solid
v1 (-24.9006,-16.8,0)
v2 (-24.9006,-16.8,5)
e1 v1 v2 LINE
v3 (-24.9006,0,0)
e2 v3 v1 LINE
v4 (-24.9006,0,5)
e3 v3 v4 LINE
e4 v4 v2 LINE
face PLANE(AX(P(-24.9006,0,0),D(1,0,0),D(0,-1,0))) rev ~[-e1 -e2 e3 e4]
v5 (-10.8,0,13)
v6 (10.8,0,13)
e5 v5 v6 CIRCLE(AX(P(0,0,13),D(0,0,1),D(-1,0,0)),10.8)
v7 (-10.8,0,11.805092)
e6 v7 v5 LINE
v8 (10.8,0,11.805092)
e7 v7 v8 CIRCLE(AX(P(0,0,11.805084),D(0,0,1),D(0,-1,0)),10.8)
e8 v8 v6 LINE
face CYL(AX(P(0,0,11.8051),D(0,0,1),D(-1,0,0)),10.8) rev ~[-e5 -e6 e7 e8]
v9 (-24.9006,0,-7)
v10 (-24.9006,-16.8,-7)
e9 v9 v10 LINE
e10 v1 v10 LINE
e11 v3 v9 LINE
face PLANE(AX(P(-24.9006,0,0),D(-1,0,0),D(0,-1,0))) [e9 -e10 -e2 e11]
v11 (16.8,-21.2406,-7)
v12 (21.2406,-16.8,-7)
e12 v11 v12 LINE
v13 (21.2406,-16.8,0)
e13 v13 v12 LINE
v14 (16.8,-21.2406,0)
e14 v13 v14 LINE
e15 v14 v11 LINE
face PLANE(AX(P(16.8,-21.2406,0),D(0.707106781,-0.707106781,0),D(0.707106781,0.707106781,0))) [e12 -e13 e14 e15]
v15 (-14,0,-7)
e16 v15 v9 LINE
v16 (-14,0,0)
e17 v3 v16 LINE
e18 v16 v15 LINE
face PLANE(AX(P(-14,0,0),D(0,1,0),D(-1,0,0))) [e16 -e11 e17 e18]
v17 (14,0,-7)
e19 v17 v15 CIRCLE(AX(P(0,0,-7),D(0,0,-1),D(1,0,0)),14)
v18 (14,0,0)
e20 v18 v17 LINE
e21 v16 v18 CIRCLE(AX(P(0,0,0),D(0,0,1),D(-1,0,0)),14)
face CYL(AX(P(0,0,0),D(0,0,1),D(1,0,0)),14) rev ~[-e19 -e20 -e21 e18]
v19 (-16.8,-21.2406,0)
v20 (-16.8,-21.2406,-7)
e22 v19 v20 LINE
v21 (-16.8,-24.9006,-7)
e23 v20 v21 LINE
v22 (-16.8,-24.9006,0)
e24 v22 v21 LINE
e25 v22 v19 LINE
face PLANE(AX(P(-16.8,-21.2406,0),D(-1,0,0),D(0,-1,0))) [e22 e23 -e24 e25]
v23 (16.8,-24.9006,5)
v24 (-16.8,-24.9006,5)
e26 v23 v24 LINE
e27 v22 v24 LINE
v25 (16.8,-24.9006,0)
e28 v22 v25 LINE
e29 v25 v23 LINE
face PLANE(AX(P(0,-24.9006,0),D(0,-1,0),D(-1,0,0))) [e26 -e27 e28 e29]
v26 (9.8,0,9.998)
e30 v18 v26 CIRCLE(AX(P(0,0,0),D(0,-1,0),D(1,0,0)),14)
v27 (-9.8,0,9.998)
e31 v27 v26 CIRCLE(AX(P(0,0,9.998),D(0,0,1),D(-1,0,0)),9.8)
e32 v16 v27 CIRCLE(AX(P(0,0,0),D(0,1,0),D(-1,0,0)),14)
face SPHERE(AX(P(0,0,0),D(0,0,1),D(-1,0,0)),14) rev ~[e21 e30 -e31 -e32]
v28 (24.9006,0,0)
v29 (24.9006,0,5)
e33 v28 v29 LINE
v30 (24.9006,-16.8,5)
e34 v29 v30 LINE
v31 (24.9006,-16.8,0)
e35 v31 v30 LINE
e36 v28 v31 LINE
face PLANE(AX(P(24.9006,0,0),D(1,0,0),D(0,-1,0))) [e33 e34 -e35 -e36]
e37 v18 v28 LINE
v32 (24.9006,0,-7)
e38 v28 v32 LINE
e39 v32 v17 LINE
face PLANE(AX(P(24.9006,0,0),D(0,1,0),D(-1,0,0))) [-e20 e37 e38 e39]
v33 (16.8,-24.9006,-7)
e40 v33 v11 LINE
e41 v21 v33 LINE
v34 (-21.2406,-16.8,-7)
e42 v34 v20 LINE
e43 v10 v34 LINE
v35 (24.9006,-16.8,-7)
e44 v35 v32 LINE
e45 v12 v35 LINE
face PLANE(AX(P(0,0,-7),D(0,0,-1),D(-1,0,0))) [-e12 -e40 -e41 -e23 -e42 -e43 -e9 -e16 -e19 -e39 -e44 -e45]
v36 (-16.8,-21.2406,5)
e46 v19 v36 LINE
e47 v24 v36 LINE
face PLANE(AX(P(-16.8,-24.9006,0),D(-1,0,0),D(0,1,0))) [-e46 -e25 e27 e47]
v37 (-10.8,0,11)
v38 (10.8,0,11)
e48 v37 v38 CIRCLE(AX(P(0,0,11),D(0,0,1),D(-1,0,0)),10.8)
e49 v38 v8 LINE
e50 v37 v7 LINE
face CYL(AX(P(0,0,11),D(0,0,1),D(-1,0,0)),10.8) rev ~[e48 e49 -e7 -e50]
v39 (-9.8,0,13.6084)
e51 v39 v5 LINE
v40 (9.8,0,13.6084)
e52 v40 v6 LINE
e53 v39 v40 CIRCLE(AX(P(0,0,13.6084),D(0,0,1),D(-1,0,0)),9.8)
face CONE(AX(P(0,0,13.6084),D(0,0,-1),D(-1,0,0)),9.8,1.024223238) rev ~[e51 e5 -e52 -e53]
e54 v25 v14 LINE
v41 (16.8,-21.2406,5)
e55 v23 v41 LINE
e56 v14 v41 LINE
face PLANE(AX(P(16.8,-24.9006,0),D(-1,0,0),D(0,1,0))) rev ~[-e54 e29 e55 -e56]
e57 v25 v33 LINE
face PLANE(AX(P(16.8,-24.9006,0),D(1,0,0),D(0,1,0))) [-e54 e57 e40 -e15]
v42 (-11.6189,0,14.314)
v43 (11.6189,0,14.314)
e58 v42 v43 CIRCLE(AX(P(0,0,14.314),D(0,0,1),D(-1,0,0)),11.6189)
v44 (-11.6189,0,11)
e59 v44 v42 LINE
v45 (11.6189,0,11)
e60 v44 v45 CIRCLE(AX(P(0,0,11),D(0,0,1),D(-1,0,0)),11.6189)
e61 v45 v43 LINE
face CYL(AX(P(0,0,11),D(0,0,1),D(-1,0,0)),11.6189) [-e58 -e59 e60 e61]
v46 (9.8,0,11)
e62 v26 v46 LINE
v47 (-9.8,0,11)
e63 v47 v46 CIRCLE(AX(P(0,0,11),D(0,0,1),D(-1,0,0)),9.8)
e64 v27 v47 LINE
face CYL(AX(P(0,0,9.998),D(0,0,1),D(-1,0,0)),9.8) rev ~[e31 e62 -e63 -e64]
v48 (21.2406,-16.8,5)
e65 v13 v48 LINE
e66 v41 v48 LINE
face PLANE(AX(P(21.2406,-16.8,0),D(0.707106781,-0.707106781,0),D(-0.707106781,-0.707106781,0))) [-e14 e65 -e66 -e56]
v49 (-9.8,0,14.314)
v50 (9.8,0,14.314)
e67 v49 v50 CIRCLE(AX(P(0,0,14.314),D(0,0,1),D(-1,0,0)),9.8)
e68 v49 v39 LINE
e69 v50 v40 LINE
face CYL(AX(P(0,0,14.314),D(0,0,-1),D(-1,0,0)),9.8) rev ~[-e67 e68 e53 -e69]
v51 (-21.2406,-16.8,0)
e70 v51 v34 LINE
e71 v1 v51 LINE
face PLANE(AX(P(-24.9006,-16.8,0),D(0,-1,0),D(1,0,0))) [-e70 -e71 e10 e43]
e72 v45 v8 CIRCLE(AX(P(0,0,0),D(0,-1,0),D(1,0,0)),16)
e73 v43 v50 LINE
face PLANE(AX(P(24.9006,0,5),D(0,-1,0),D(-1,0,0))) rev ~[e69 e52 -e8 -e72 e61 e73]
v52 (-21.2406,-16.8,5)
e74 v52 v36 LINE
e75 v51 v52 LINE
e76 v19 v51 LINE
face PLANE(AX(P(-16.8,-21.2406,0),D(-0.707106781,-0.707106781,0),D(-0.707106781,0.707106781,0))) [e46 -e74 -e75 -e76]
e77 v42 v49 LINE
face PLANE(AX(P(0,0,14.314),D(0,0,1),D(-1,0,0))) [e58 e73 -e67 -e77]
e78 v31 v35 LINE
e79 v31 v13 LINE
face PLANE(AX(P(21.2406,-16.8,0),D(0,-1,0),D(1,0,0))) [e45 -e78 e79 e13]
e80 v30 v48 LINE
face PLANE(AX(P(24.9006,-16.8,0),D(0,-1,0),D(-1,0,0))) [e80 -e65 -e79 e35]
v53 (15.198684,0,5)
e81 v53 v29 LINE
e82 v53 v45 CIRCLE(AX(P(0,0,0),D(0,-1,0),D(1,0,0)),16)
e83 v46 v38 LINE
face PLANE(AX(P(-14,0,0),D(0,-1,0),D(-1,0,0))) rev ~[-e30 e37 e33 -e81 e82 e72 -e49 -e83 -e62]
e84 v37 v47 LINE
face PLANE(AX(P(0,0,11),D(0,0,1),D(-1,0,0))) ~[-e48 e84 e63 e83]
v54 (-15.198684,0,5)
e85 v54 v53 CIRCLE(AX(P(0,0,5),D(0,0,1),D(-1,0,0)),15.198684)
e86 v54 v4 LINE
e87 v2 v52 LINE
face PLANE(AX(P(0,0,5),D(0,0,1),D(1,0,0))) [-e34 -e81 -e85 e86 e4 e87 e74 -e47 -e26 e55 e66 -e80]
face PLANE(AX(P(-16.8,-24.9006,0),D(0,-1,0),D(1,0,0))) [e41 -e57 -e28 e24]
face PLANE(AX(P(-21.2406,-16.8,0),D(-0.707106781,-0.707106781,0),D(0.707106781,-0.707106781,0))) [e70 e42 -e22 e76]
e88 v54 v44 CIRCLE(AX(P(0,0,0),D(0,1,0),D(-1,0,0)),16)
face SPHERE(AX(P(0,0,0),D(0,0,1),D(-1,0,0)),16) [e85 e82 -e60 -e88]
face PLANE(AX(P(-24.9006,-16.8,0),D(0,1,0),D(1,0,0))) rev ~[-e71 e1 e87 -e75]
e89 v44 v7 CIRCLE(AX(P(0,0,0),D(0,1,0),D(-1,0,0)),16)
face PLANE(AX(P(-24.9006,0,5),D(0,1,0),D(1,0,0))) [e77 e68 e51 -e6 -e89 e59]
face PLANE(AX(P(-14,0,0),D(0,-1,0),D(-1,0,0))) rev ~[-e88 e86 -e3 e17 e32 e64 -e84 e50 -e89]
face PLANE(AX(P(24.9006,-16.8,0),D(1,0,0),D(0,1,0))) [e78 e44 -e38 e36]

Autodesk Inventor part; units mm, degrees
ref_plane "YZ Plane" through (0, 0, 0) normal (1, 0, 0) x (0, 1, 0)
ref_plane "XZ Plane" through (0, 0, 0) normal (0, 1, 0) x (-1, 0, 0)
sketch "Sketch1" plane through (0, 0, 0) normal (0, 0, 1) x (1, 0, 0)
  line L0 (-36.8533, 0) -> (46.8153, 0) construction
  line L1 (0, -29.8808) -> (0, 4.9801) construction
  line L2 (0, 0) -> (24.6516, -24.6516) construction
  line L3 (0, 0) -> (34.8626, 0) construction
  line L4 (0, -24.9006) -> (16.8, -24.9006)
  line L5 (16.8, -24.9006) -> (16.8, -21.2406)
  line L6 (16.8, -21.2406) -> (19.0203, -19.0203)
  line L7 (24.9006, 0) -> (24.9006, -16.8)
  line L8 (24.9006, -16.8) -> (21.2406, -16.8)
  line L9 (21.2406, -16.8) -> (19.0203, -19.0203)
  line L10 (0, 0) -> (-24.6516, -24.6516) construction
  line L11 (0, -24.9006) -> (-16.8, -24.9006)
  line L12 (-16.8, -24.9006) -> (-16.8, -21.2406)
  line L13 (-16.8, -21.2406) -> (-19.0203, -19.0203)
  line L14 (-24.9006, 0) -> (-24.9006, -16.8)
  line L15 (-24.9006, -16.8) -> (-21.2406, -16.8)
  line L16 (-21.2406, -16.8) -> (-19.0203, -19.0203)
  arc A0 (-14, 0) -> (14, 0) centre (0, 0) ccw
  line L17 (0, 0) -> (14, 0) construction
  line L18 (0, 0) -> (-14, 0) construction
  line L19 (-14, 0) -> (-24.9006, 0)
  line L20 (14, 0) -> (24.9006, 0)
  dimension "d0" = 45
  dimension "d1" = 16.8
  dimension "d2" = 3.66
  dimension "d4" = 3.14
  dimension "d5" = 14
  dimension "d6" = 180
extrude "Extrusion1" add sketch "Sketch1" along normal blind 5
sketch "Sketch3" plane through (-24.9006, 0, 0) normal (0, 1, 0) x (1, 0, 0)
  line L0 (10.9006, 0) -> (0, 0) construction
  line L1 (0, 0) -> (0, -5) construction
  line L2 (10.9006, -5) -> (0, -5) construction
  line L3 (10.9006, 0) -> (10.9006, -5) construction
  line L4 (38.9006, 0) -> (10.9006, 0) construction
  line L5 (10.9006, 0) -> (10.9006, -5) construction
  line L6 (38.9006, -5) -> (10.9006, -5) construction
  line L7 (38.9006, 0) -> (38.9006, -5) construction
  line L8 (49.8013, 0) -> (38.9006, 0) construction
  line L9 (38.9006, 0) -> (38.9006, -5) construction
  line L10 (49.8013, -5) -> (38.9006, -5) construction
  line L11 (49.8013, 0) -> (49.8013, -5) construction
  line L12 (24.9006, 18.5006) -> (24.9006, -23.5037) construction
  arc A0 (10.9006, 0) -> (24.9006, -14) centre (24.9006, 0) ccw
  arc A1 (8.9006, 0) -> (24.9006, -16) centre (24.9006, 0) ccw
  line L13 (24.9006, -16) -> (24.9006, -14)
  line L14 (10.9006, 0) -> (0, 0) projected
  line L15 (8.9006, 0) -> (10.9006, 0)
  dimension "d11" = 2
revolve "Revolution2" add sketch "Sketch3" angle 180 about axis through (0, 0, -10) along (0, 0, 1)
ref_plane "Work Plane1" through (0, 0, 16) normal (0, 0, 1) x (1, 0, 0)
sketch "Sketch5" plane through (24.9006, 0, 5) normal (0, 1, 0) x (1, 0, 0)
  line L0 (0, 0) -> (-9.7019, 0) construction
  line L1 (0, 5) -> (0, 0) construction
  line L2 (0, 5) -> (-10.9006, 5) construction
  arc A0 (-38.9006, 5) -> (-10.9006, 5) centre (-24.9006, 5) ccw construction
  line L3 (-38.9006, 5) -> (-49.8013, 5) construction
  line L4 (-49.8013, 5) -> (-49.8013, 0) construction
  line L5 (-40.0993, 0) -> (-49.8013, 0) construction
  arc A1 (-40.0993, 0) -> (-9.7019, 0) centre (-24.9006, 5) ccw construction
  arc A2 (-38.9006, 5) -> (-10.9006, 5) centre (-24.9006, 5) ccw construction
  line L6 (-10.9006, 5) -> (-38.9006, 5) construction
  line L7 (-24.9006, 25) -> (-24.9006, -17) construction
  line L8 (-24.9006, -6) -> (-35.7006, -6)
  line L9 (-35.7006, -6) -> (-35.7006, -8.1)
  line L10 (-35.7006, -8.1) -> (-24.9006, -8.1)
  line L11 (-24.9006, -8.1) -> (-24.9006, -6)
  arc A3 (-10.9006, 5) -> (-38.9006, 5) centre (-24.9006, 5) ccw construction
  line L12 (-24.9006, 19) -> (-24.9006, -6) construction
  line L13 (-24.9006, 19) -> (0.0994, 19) construction
  line L14 (-34.7006, -6) -> (-33.5609, -6)
  line L15 (-33.5609, -6) -> (-33.5609, -4.998)
  line L16 (-33.5609, -4.998) -> (-34.7006, -4.998)
  line L17 (-34.7006, -4.998) -> (-34.7006, -6)
  arc A4 (-38.9006, 5) -> (-10.9006, 5) centre (-24.9006, 5) ccw projected
  line L18 (-24.9006, -8.1) -> (-34.087, -8.1)
  line L19 (-34.087, -8.1) -> (-34.087, -11)
  line L20 (-34.087, -11) -> (-24.9006, -11)
  line L21 (-24.9006, -11) -> (-24.9006, -8.1)
  arc A5 (-40.0993, 0) -> (-9.7019, 0) centre (-24.9006, 5) ccw projected
  dimension "d16" = 10.8
  dimension "d17" = 2.1
  dimension "d19" = 25
  dimension "d20" = 90
  dimension "d21" = 1
revolve "Revolution3" cut sketch "Sketch5" angle 360 about axis through (0, 0, -10) along (0, 0, 1) contours L11 L10 A4 L8 | A4 L10 A5 L9 L8 | L8 L17 A4 | L21 A4 L10 | A4 L21 A5 L10 | L10 L9 A5
sketch "Sketch6" plane through (-24.9006, 0, 5) normal (0, 1, 0) x (1, 0, 0)
  line L0 (14.1006, -6.8051) -> (14.1006, -6) construction
  line L1 (14.1006, -6) -> (15.1006, -6) construction
  line L2 (15.1006, -6) -> (15.1006, -4.998) construction
  arc A0 (10.9006, 5) -> (15.1006, -4.998) centre (24.9006, 5) ccw construction
  line L3 (10.9006, 5) -> (0, 5) construction
  line L4 (0, 5) -> (0, 0) construction
  line L5 (9.7019, 0) -> (0, 0) construction
  arc A1 (9.7019, 0) -> (14.1006, -6.8051) centre (24.9006, 5) ccw construction
  line L6 (24.9006, 7.4176) -> (24.9006, -9.5058) construction
  arc A2 (9.7019, 0) -> (14.1006, -6.8051) centre (24.9006, 5) ccw projected
  line L7 (13.2817, -6) -> (13.2817, -9.314)
  line L8 (14.1006, -6) -> (24.9006, -6) construction
  line L9 (24.9006, -6) -> (24.9006, -8) construction
  line L10 (24.9006, -8) -> (14.1006, -8) construction
  line L11 (14.1006, -8) -> (14.1006, -6) construction
  line L12 (35.7006, -6) -> (14.1006, -6) construction
  line L13 (14.1006, -6) -> (24.9006, -6) construction
  line L14 (24.9006, -6) -> (24.9006, -11.2) construction
  line L15 (24.9006, -11.2) -> (14.1006, -11.2) construction
  line L16 (14.1006, -11.2) -> (14.1006, -6) construction
  arc A3 (14.1006, -8) -> (24.9006, -11.2) centre (24.9006, 8.625) ccw construction
  line L17 (14.1006, -6.8051) -> (14.1006, -8)
  line L18 (13.2817, -9.314) -> (15.1006, -9.314)
  line L19 (15.1006, -9.314) -> (15.1006, -8.6084)
  line L20 (15.1006, -8.6084) -> (14.1006, -8)
  line L21 (13.2817, -6) -> (14.1006, -6)
  line L22 (35.7006, -6.8051) -> (14.1006, -6.8051) projected
  line L23 (14.1006, -6.8051) -> (14.1006, -6)
  dimension "d23" = 2
  dimension "d24" = 5.2
revolve "Revolution4" add sketch "Sketch6" angle 180 about axis through (0, 0, -10) along (0, 0, 1) contours A2 L17 L20 L19 L18 L7
sketch "Sketch7" plane through (0, 0, 0) normal (0, 0, -1) x (-1, 0, 0)
  line L0 (-24.9006, 0) -> (-14, 0) projected
  line L1 (-24.9006, -16.8) -> (-24.9006, 0) projected
  line L2 (-21.2406, -16.8) -> (-24.9006, -16.8) projected
  line L3 (-16.8, -21.2406) -> (-21.2406, -16.8) projected
  line L4 (-16.8, -24.9006) -> (-16.8, -21.2406) projected
  line L5 (16.8, -24.9006) -> (-16.8, -24.9006) projected
  line L6 (16.8, -21.2406) -> (16.8, -24.9006) projected
  line L7 (21.2406, -16.8) -> (16.8, -21.2406) projected
  line L8 (24.9006, -16.8) -> (21.2406, -16.8) projected
  line L9 (24.9006, 0) -> (24.9006, -16.8) projected
  line L10 (14, 0) -> (24.9006, 0) projected
  arc A0 (-14, 0) -> (14, 0) centre (0, 0) ccw projected
extrude "Extrusion3" add sketch "Sketch7" along normal blind 7
properties part number "20_Cube_Insert_Eye_Lens"
